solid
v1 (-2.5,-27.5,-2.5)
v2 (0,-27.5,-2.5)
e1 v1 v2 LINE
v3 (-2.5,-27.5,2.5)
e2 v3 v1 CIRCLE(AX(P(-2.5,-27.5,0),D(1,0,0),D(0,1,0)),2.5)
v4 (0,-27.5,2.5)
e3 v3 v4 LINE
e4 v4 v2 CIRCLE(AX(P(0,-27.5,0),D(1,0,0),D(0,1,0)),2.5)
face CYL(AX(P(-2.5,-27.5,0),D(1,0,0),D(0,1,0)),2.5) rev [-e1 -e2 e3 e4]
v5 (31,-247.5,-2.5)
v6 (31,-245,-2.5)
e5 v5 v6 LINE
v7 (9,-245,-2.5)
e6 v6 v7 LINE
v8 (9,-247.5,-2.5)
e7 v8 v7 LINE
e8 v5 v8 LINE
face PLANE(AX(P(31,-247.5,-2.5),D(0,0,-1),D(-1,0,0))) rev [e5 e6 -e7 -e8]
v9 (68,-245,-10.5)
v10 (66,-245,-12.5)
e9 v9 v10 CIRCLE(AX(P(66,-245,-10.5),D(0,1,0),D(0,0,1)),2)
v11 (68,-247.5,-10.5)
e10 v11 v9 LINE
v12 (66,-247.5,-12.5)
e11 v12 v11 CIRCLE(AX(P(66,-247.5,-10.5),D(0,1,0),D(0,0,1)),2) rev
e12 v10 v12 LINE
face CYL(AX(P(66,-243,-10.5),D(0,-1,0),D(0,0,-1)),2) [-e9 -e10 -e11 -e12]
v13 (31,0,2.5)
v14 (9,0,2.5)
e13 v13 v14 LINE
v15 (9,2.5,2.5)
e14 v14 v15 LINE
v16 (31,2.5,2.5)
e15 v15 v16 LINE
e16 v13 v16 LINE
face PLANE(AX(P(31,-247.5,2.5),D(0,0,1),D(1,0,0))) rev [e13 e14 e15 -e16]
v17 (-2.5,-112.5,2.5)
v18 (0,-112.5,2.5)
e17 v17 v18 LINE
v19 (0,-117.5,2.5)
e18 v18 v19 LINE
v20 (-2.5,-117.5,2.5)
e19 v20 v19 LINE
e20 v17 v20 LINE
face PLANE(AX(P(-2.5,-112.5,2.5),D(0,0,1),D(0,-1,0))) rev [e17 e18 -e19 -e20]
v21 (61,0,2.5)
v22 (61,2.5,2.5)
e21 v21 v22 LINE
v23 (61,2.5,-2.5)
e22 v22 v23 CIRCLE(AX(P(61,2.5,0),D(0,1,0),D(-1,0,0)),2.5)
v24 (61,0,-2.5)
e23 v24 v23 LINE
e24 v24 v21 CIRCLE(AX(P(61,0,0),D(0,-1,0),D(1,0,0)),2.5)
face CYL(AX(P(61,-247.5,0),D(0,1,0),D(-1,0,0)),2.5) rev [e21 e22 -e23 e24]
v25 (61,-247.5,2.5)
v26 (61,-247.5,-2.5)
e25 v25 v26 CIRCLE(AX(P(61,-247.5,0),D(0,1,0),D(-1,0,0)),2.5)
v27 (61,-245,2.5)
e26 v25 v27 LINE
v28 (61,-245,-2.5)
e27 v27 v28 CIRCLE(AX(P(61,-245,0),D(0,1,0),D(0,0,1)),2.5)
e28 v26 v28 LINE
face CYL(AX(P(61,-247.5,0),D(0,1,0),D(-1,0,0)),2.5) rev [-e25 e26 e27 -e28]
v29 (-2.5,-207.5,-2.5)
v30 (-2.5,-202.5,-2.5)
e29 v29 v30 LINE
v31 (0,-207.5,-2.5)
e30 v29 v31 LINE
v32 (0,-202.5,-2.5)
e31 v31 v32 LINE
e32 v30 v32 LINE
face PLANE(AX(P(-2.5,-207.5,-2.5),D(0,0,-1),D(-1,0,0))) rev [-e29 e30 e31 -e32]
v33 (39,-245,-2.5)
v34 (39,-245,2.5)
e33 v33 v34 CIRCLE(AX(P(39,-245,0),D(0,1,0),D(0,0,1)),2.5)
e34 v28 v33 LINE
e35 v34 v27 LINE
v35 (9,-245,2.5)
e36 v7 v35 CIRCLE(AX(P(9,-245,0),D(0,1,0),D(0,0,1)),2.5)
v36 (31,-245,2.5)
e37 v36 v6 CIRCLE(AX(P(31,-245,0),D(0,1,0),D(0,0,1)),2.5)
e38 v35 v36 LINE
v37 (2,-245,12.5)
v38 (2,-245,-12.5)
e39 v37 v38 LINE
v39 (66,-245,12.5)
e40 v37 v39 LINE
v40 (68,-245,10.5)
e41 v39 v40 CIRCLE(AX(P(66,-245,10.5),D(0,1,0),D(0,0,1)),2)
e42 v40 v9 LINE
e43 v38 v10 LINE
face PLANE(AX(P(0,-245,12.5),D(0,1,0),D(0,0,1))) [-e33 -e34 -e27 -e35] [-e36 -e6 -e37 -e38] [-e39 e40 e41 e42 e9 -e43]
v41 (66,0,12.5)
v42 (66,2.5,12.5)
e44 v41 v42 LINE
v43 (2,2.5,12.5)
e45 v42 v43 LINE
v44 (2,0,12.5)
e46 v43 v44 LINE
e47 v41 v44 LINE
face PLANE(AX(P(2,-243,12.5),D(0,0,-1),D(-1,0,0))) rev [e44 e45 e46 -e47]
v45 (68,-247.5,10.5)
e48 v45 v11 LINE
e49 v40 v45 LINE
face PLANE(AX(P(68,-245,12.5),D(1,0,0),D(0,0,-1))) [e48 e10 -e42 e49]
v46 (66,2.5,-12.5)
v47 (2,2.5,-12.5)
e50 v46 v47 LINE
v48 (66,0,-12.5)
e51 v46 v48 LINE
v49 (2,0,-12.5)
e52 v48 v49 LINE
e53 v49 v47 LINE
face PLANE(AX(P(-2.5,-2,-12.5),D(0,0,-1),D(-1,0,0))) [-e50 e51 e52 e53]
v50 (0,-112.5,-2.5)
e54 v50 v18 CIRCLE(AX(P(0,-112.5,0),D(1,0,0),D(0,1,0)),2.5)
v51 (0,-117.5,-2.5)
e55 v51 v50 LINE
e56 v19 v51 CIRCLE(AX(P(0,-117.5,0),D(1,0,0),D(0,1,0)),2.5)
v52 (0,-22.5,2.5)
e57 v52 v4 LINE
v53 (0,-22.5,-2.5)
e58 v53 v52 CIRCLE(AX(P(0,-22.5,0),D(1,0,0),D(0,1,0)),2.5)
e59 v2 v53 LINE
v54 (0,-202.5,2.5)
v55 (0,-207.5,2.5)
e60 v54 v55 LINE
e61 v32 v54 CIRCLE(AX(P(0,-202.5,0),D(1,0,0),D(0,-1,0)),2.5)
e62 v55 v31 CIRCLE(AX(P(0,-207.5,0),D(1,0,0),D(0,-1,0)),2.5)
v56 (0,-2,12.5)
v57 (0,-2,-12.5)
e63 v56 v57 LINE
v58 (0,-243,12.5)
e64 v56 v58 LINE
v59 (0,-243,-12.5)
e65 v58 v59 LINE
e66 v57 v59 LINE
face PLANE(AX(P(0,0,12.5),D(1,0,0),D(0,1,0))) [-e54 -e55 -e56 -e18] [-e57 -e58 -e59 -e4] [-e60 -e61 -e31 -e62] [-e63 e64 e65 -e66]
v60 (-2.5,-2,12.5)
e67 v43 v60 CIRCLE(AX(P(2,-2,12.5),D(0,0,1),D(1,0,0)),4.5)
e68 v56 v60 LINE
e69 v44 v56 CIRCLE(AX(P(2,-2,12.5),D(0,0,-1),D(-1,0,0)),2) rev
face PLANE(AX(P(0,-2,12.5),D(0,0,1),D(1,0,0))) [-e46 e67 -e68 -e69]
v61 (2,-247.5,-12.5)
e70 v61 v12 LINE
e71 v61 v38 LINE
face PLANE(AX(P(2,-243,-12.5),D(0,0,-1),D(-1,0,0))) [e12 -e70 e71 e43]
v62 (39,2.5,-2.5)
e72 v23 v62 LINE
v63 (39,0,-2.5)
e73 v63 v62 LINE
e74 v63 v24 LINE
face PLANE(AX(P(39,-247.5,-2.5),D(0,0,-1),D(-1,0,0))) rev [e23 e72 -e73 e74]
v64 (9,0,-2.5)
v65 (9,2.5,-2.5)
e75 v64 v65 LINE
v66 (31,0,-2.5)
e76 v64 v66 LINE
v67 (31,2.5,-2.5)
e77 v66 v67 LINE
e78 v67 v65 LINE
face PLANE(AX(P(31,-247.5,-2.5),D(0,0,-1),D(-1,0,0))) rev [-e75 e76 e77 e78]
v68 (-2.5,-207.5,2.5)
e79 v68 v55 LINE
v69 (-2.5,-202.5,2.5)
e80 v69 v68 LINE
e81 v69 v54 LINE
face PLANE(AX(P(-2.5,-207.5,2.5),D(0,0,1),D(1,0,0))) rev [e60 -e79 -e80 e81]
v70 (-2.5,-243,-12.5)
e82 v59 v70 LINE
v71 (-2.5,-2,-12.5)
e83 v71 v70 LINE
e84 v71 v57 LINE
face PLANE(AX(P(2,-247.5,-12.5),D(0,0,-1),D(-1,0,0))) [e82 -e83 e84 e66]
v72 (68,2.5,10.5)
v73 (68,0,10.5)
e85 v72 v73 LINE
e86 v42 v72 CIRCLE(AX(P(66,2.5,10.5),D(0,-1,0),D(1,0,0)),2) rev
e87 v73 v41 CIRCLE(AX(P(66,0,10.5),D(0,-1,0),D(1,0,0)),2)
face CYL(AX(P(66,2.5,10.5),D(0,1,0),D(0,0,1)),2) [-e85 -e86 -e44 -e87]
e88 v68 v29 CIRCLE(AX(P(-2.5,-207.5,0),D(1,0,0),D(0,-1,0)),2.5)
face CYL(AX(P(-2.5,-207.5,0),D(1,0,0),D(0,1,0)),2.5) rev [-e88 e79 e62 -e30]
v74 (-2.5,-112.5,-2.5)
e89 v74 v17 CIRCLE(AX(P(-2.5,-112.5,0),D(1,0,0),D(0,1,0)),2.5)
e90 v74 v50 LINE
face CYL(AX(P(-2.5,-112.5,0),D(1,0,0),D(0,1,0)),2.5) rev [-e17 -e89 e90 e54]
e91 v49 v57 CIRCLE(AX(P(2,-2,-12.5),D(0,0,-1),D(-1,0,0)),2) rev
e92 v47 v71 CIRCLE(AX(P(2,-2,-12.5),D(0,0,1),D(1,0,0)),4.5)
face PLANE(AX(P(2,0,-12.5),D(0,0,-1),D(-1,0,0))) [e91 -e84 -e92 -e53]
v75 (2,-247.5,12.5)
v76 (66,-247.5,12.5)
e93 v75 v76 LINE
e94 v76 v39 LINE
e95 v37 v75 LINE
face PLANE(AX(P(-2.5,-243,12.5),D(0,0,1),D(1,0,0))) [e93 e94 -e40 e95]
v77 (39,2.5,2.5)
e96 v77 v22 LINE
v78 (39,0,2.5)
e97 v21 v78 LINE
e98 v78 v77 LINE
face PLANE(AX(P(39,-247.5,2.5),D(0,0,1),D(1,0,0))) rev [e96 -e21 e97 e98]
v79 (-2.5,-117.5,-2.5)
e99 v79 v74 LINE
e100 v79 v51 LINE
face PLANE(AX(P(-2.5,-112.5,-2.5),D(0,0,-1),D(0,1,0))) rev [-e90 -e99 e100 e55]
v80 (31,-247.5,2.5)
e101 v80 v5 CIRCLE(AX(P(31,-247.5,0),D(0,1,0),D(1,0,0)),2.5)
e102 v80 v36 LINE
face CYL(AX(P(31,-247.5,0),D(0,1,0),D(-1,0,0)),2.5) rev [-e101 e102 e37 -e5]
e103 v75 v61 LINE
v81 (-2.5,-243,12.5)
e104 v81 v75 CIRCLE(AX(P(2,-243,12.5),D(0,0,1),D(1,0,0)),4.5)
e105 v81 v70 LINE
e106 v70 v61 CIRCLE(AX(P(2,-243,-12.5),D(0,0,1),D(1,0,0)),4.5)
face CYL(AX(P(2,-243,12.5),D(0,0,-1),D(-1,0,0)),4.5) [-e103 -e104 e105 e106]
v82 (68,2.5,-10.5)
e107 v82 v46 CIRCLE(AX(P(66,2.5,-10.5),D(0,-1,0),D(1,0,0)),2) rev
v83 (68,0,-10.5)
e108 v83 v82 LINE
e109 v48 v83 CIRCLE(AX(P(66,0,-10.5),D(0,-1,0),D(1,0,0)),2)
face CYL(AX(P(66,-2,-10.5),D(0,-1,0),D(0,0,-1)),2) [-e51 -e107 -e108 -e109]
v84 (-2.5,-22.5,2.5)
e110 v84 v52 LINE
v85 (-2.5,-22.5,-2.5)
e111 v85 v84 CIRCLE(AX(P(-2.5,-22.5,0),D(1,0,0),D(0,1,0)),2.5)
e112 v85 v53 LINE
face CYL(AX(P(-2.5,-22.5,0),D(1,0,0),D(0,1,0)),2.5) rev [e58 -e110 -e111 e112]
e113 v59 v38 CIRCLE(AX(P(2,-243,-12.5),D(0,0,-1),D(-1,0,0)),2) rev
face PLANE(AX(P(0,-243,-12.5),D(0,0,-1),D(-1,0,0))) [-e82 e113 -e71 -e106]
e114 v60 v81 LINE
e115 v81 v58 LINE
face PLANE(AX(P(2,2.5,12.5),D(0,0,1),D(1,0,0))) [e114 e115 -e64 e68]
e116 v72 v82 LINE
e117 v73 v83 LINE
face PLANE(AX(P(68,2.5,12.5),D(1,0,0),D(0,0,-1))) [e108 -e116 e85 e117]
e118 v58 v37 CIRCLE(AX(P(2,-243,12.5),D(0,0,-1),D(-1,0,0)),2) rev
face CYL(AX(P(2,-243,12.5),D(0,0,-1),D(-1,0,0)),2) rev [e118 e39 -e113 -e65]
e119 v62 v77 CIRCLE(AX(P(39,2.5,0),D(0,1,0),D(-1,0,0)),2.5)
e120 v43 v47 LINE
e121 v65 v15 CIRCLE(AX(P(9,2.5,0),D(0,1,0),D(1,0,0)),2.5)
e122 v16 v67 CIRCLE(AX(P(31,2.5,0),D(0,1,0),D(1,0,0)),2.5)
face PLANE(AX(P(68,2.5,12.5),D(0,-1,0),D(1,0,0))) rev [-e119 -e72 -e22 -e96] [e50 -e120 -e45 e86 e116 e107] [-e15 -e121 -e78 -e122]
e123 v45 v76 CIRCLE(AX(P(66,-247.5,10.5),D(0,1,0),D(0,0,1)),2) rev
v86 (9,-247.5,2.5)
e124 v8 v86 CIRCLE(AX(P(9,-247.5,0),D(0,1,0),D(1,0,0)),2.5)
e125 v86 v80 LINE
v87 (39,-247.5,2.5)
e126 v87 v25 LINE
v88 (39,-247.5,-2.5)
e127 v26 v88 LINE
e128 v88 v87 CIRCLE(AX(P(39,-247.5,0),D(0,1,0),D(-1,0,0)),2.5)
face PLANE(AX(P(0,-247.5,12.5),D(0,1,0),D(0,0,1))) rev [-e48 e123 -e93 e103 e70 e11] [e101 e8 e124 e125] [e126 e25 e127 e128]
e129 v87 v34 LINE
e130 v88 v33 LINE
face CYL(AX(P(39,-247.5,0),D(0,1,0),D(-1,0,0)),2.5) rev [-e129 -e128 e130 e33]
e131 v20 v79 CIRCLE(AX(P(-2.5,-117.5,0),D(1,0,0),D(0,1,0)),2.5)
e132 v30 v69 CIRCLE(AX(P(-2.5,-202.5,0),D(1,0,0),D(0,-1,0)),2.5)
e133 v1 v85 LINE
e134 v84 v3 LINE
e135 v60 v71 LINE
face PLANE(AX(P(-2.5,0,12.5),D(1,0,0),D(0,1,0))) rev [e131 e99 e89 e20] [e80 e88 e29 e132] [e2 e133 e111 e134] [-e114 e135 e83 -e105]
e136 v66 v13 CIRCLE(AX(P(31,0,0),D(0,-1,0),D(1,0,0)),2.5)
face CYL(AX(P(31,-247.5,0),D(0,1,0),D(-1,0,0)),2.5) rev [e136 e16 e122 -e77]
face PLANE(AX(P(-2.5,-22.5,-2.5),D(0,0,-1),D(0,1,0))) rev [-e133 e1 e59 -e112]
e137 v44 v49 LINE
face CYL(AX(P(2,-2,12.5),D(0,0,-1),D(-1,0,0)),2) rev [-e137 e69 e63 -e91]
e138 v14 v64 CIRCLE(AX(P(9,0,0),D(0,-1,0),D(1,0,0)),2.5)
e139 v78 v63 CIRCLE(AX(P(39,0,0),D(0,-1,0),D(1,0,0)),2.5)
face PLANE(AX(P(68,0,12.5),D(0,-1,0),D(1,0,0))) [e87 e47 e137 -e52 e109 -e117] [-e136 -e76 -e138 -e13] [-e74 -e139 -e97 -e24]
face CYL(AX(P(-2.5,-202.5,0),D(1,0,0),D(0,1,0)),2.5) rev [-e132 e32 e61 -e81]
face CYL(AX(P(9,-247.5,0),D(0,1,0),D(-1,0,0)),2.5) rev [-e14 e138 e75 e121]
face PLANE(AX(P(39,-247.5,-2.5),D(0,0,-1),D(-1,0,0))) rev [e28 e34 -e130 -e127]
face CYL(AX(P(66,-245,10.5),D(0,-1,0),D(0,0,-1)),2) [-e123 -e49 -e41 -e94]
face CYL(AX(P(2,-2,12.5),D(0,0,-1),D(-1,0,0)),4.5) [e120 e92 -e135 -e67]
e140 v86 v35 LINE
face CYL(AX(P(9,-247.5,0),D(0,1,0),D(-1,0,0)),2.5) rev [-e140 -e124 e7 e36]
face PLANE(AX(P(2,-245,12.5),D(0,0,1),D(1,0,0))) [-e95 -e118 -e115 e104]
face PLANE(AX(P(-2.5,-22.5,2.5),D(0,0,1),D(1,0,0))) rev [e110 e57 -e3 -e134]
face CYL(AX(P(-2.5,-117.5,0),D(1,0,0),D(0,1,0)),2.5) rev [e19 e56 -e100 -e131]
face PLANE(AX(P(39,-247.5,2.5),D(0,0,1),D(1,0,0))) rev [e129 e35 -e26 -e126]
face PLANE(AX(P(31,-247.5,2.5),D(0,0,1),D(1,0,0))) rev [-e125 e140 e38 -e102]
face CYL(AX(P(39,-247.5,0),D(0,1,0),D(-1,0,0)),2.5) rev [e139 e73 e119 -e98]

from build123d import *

# Parameters (mm, degrees)
SM_BASE_FLANGE_1_DEPTH = 12.5
CUT_EXTRUDE_1_DEPTH    = 257.975679783
CUT_EXTRUDE_2_DEPTH    = 260.384367301
OTHER_START            = -247.5
OTHER_1_DEPTH          = 250


# Read off the part's stored shape, not the designer's step: 断开-边角1
# Sheet-metal steps are written as plain solids
with BuildPart() as part:
    # Sketch 1 → 基体-法兰1 (new, symmetric)
    with BuildSketch(Plane.XY):
        with BuildLine():
            Line((68, 0), (2, 0))
            ThreePointArc((2, 0), (0.585786438, -0.585786438), (0, -2))
            Line((0, -2), (0, -243))
            ThreePointArc((0, -243), (0.585786438, -244.414213562), (2, -245))
            Line((2, -245), (68, -245))
            Line((68, -245), (68, -247.5))
            Line((68, -247.5), (2, -247.5))
            ThreePointArc((2, -247.5), (-1.181980515, -246.181980515), (-2.5, -243))
            Line((-2.5, -243), (-2.5, -2))
            ThreePointArc((-2.5, -2), (-1.181980515, 1.181980515), (2, 2.5))
            Line((2, 2.5), (68, 2.5))
            Line((68, 2.5), (68, 0))
        make_face()
    extrude(amount=SM_BASE_FLANGE_1_DEPTH, both=True)

    # 草图4 → 切除-拉伸1 (cut, through all)
    with BuildSketch(Plane(origin=(0, 0, 0), x_dir=(0, 0, -1), z_dir=(1, 0, 0))):
        with BuildLine():
            Line((2.5, -22.5), (2.5, -27.5))
            ThreePointArc((2.5, -27.5), (0, -30), (-2.5, -27.5))
            Line((-2.5, -27.5), (-2.5, -22.5))
            ThreePointArc((-2.5, -22.5), (0, -20), (2.5, -22.5))
        make_face()
        with BuildLine():
            Line((2.5, -112.5), (2.5, -117.5))
            ThreePointArc((2.5, -117.5), (0, -120), (-2.5, -117.5))
            Line((-2.5, -117.5), (-2.5, -112.5))
            ThreePointArc((-2.5, -112.5), (0, -110), (2.5, -112.5))
        make_face()
        with BuildLine():
            Line((2.5, -207.5), (2.5, -202.5))
            ThreePointArc((2.5, -202.5), (0, -200), (-2.5, -202.5))
            Line((-2.5, -202.5), (-2.5, -207.5))
            ThreePointArc((-2.5, -207.5), (0, -210), (2.5, -207.5))
        make_face()
    extrude(amount=-CUT_EXTRUDE_1_DEPTH, mode=Mode.SUBTRACT)

    # 草图7 → 切除-拉伸2 (cut, through all)
    with BuildSketch(Plane(origin=(0, 2.5, 0), x_dir=(1, 0, 0), z_dir=(0, 1, 0))):
        with BuildLine():
            Line((39, 2.5), (61, 2.5))
            ThreePointArc((61, 2.5), (63.5, 0), (61, -2.5))
            Line((61, -2.5), (39, -2.5))
            ThreePointArc((39, -2.5), (36.5, 0), (39, 2.5))
        make_face()
        with BuildLine():
            Line((31, 2.5), (9, 2.5))
            ThreePointArc((9, 2.5), (6.5, 0), (9, -2.5))
            Line((9, -2.5), (31, -2.5))
            ThreePointArc((31, -2.5), (33.5, 0), (31, 2.5))
        make_face()
    extrude(amount=-CUT_EXTRUDE_2_DEPTH, mode=Mode.SUBTRACT)

    # Other 1 outline → Other 1 (cut)
    with BuildSketch(Plane(origin=(0, 0, 0), x_dir=(1, 0, 0), z_dir=(0, 1, 0)).offset(OTHER_START)):
        with BuildLine():
            Line((68, -12.5), (68, -10.5))
            ThreePointArc((68, -10.5), (67.414213562, -11.914213562), (66, -12.5))
            Line((66, -12.5), (68, -12.5))
        make_face()
        with BuildLine():
            ThreePointArc((66, 12.5), (67.414213562, 11.914213562), (68, 10.5))
            Line((68, 10.5), (68, 12.5))
            Line((68, 12.5), (66, 12.5))
        make_face()
    extrude(amount=OTHER_1_DEPTH, mode=Mode.SUBTRACT)


solid = part.part
